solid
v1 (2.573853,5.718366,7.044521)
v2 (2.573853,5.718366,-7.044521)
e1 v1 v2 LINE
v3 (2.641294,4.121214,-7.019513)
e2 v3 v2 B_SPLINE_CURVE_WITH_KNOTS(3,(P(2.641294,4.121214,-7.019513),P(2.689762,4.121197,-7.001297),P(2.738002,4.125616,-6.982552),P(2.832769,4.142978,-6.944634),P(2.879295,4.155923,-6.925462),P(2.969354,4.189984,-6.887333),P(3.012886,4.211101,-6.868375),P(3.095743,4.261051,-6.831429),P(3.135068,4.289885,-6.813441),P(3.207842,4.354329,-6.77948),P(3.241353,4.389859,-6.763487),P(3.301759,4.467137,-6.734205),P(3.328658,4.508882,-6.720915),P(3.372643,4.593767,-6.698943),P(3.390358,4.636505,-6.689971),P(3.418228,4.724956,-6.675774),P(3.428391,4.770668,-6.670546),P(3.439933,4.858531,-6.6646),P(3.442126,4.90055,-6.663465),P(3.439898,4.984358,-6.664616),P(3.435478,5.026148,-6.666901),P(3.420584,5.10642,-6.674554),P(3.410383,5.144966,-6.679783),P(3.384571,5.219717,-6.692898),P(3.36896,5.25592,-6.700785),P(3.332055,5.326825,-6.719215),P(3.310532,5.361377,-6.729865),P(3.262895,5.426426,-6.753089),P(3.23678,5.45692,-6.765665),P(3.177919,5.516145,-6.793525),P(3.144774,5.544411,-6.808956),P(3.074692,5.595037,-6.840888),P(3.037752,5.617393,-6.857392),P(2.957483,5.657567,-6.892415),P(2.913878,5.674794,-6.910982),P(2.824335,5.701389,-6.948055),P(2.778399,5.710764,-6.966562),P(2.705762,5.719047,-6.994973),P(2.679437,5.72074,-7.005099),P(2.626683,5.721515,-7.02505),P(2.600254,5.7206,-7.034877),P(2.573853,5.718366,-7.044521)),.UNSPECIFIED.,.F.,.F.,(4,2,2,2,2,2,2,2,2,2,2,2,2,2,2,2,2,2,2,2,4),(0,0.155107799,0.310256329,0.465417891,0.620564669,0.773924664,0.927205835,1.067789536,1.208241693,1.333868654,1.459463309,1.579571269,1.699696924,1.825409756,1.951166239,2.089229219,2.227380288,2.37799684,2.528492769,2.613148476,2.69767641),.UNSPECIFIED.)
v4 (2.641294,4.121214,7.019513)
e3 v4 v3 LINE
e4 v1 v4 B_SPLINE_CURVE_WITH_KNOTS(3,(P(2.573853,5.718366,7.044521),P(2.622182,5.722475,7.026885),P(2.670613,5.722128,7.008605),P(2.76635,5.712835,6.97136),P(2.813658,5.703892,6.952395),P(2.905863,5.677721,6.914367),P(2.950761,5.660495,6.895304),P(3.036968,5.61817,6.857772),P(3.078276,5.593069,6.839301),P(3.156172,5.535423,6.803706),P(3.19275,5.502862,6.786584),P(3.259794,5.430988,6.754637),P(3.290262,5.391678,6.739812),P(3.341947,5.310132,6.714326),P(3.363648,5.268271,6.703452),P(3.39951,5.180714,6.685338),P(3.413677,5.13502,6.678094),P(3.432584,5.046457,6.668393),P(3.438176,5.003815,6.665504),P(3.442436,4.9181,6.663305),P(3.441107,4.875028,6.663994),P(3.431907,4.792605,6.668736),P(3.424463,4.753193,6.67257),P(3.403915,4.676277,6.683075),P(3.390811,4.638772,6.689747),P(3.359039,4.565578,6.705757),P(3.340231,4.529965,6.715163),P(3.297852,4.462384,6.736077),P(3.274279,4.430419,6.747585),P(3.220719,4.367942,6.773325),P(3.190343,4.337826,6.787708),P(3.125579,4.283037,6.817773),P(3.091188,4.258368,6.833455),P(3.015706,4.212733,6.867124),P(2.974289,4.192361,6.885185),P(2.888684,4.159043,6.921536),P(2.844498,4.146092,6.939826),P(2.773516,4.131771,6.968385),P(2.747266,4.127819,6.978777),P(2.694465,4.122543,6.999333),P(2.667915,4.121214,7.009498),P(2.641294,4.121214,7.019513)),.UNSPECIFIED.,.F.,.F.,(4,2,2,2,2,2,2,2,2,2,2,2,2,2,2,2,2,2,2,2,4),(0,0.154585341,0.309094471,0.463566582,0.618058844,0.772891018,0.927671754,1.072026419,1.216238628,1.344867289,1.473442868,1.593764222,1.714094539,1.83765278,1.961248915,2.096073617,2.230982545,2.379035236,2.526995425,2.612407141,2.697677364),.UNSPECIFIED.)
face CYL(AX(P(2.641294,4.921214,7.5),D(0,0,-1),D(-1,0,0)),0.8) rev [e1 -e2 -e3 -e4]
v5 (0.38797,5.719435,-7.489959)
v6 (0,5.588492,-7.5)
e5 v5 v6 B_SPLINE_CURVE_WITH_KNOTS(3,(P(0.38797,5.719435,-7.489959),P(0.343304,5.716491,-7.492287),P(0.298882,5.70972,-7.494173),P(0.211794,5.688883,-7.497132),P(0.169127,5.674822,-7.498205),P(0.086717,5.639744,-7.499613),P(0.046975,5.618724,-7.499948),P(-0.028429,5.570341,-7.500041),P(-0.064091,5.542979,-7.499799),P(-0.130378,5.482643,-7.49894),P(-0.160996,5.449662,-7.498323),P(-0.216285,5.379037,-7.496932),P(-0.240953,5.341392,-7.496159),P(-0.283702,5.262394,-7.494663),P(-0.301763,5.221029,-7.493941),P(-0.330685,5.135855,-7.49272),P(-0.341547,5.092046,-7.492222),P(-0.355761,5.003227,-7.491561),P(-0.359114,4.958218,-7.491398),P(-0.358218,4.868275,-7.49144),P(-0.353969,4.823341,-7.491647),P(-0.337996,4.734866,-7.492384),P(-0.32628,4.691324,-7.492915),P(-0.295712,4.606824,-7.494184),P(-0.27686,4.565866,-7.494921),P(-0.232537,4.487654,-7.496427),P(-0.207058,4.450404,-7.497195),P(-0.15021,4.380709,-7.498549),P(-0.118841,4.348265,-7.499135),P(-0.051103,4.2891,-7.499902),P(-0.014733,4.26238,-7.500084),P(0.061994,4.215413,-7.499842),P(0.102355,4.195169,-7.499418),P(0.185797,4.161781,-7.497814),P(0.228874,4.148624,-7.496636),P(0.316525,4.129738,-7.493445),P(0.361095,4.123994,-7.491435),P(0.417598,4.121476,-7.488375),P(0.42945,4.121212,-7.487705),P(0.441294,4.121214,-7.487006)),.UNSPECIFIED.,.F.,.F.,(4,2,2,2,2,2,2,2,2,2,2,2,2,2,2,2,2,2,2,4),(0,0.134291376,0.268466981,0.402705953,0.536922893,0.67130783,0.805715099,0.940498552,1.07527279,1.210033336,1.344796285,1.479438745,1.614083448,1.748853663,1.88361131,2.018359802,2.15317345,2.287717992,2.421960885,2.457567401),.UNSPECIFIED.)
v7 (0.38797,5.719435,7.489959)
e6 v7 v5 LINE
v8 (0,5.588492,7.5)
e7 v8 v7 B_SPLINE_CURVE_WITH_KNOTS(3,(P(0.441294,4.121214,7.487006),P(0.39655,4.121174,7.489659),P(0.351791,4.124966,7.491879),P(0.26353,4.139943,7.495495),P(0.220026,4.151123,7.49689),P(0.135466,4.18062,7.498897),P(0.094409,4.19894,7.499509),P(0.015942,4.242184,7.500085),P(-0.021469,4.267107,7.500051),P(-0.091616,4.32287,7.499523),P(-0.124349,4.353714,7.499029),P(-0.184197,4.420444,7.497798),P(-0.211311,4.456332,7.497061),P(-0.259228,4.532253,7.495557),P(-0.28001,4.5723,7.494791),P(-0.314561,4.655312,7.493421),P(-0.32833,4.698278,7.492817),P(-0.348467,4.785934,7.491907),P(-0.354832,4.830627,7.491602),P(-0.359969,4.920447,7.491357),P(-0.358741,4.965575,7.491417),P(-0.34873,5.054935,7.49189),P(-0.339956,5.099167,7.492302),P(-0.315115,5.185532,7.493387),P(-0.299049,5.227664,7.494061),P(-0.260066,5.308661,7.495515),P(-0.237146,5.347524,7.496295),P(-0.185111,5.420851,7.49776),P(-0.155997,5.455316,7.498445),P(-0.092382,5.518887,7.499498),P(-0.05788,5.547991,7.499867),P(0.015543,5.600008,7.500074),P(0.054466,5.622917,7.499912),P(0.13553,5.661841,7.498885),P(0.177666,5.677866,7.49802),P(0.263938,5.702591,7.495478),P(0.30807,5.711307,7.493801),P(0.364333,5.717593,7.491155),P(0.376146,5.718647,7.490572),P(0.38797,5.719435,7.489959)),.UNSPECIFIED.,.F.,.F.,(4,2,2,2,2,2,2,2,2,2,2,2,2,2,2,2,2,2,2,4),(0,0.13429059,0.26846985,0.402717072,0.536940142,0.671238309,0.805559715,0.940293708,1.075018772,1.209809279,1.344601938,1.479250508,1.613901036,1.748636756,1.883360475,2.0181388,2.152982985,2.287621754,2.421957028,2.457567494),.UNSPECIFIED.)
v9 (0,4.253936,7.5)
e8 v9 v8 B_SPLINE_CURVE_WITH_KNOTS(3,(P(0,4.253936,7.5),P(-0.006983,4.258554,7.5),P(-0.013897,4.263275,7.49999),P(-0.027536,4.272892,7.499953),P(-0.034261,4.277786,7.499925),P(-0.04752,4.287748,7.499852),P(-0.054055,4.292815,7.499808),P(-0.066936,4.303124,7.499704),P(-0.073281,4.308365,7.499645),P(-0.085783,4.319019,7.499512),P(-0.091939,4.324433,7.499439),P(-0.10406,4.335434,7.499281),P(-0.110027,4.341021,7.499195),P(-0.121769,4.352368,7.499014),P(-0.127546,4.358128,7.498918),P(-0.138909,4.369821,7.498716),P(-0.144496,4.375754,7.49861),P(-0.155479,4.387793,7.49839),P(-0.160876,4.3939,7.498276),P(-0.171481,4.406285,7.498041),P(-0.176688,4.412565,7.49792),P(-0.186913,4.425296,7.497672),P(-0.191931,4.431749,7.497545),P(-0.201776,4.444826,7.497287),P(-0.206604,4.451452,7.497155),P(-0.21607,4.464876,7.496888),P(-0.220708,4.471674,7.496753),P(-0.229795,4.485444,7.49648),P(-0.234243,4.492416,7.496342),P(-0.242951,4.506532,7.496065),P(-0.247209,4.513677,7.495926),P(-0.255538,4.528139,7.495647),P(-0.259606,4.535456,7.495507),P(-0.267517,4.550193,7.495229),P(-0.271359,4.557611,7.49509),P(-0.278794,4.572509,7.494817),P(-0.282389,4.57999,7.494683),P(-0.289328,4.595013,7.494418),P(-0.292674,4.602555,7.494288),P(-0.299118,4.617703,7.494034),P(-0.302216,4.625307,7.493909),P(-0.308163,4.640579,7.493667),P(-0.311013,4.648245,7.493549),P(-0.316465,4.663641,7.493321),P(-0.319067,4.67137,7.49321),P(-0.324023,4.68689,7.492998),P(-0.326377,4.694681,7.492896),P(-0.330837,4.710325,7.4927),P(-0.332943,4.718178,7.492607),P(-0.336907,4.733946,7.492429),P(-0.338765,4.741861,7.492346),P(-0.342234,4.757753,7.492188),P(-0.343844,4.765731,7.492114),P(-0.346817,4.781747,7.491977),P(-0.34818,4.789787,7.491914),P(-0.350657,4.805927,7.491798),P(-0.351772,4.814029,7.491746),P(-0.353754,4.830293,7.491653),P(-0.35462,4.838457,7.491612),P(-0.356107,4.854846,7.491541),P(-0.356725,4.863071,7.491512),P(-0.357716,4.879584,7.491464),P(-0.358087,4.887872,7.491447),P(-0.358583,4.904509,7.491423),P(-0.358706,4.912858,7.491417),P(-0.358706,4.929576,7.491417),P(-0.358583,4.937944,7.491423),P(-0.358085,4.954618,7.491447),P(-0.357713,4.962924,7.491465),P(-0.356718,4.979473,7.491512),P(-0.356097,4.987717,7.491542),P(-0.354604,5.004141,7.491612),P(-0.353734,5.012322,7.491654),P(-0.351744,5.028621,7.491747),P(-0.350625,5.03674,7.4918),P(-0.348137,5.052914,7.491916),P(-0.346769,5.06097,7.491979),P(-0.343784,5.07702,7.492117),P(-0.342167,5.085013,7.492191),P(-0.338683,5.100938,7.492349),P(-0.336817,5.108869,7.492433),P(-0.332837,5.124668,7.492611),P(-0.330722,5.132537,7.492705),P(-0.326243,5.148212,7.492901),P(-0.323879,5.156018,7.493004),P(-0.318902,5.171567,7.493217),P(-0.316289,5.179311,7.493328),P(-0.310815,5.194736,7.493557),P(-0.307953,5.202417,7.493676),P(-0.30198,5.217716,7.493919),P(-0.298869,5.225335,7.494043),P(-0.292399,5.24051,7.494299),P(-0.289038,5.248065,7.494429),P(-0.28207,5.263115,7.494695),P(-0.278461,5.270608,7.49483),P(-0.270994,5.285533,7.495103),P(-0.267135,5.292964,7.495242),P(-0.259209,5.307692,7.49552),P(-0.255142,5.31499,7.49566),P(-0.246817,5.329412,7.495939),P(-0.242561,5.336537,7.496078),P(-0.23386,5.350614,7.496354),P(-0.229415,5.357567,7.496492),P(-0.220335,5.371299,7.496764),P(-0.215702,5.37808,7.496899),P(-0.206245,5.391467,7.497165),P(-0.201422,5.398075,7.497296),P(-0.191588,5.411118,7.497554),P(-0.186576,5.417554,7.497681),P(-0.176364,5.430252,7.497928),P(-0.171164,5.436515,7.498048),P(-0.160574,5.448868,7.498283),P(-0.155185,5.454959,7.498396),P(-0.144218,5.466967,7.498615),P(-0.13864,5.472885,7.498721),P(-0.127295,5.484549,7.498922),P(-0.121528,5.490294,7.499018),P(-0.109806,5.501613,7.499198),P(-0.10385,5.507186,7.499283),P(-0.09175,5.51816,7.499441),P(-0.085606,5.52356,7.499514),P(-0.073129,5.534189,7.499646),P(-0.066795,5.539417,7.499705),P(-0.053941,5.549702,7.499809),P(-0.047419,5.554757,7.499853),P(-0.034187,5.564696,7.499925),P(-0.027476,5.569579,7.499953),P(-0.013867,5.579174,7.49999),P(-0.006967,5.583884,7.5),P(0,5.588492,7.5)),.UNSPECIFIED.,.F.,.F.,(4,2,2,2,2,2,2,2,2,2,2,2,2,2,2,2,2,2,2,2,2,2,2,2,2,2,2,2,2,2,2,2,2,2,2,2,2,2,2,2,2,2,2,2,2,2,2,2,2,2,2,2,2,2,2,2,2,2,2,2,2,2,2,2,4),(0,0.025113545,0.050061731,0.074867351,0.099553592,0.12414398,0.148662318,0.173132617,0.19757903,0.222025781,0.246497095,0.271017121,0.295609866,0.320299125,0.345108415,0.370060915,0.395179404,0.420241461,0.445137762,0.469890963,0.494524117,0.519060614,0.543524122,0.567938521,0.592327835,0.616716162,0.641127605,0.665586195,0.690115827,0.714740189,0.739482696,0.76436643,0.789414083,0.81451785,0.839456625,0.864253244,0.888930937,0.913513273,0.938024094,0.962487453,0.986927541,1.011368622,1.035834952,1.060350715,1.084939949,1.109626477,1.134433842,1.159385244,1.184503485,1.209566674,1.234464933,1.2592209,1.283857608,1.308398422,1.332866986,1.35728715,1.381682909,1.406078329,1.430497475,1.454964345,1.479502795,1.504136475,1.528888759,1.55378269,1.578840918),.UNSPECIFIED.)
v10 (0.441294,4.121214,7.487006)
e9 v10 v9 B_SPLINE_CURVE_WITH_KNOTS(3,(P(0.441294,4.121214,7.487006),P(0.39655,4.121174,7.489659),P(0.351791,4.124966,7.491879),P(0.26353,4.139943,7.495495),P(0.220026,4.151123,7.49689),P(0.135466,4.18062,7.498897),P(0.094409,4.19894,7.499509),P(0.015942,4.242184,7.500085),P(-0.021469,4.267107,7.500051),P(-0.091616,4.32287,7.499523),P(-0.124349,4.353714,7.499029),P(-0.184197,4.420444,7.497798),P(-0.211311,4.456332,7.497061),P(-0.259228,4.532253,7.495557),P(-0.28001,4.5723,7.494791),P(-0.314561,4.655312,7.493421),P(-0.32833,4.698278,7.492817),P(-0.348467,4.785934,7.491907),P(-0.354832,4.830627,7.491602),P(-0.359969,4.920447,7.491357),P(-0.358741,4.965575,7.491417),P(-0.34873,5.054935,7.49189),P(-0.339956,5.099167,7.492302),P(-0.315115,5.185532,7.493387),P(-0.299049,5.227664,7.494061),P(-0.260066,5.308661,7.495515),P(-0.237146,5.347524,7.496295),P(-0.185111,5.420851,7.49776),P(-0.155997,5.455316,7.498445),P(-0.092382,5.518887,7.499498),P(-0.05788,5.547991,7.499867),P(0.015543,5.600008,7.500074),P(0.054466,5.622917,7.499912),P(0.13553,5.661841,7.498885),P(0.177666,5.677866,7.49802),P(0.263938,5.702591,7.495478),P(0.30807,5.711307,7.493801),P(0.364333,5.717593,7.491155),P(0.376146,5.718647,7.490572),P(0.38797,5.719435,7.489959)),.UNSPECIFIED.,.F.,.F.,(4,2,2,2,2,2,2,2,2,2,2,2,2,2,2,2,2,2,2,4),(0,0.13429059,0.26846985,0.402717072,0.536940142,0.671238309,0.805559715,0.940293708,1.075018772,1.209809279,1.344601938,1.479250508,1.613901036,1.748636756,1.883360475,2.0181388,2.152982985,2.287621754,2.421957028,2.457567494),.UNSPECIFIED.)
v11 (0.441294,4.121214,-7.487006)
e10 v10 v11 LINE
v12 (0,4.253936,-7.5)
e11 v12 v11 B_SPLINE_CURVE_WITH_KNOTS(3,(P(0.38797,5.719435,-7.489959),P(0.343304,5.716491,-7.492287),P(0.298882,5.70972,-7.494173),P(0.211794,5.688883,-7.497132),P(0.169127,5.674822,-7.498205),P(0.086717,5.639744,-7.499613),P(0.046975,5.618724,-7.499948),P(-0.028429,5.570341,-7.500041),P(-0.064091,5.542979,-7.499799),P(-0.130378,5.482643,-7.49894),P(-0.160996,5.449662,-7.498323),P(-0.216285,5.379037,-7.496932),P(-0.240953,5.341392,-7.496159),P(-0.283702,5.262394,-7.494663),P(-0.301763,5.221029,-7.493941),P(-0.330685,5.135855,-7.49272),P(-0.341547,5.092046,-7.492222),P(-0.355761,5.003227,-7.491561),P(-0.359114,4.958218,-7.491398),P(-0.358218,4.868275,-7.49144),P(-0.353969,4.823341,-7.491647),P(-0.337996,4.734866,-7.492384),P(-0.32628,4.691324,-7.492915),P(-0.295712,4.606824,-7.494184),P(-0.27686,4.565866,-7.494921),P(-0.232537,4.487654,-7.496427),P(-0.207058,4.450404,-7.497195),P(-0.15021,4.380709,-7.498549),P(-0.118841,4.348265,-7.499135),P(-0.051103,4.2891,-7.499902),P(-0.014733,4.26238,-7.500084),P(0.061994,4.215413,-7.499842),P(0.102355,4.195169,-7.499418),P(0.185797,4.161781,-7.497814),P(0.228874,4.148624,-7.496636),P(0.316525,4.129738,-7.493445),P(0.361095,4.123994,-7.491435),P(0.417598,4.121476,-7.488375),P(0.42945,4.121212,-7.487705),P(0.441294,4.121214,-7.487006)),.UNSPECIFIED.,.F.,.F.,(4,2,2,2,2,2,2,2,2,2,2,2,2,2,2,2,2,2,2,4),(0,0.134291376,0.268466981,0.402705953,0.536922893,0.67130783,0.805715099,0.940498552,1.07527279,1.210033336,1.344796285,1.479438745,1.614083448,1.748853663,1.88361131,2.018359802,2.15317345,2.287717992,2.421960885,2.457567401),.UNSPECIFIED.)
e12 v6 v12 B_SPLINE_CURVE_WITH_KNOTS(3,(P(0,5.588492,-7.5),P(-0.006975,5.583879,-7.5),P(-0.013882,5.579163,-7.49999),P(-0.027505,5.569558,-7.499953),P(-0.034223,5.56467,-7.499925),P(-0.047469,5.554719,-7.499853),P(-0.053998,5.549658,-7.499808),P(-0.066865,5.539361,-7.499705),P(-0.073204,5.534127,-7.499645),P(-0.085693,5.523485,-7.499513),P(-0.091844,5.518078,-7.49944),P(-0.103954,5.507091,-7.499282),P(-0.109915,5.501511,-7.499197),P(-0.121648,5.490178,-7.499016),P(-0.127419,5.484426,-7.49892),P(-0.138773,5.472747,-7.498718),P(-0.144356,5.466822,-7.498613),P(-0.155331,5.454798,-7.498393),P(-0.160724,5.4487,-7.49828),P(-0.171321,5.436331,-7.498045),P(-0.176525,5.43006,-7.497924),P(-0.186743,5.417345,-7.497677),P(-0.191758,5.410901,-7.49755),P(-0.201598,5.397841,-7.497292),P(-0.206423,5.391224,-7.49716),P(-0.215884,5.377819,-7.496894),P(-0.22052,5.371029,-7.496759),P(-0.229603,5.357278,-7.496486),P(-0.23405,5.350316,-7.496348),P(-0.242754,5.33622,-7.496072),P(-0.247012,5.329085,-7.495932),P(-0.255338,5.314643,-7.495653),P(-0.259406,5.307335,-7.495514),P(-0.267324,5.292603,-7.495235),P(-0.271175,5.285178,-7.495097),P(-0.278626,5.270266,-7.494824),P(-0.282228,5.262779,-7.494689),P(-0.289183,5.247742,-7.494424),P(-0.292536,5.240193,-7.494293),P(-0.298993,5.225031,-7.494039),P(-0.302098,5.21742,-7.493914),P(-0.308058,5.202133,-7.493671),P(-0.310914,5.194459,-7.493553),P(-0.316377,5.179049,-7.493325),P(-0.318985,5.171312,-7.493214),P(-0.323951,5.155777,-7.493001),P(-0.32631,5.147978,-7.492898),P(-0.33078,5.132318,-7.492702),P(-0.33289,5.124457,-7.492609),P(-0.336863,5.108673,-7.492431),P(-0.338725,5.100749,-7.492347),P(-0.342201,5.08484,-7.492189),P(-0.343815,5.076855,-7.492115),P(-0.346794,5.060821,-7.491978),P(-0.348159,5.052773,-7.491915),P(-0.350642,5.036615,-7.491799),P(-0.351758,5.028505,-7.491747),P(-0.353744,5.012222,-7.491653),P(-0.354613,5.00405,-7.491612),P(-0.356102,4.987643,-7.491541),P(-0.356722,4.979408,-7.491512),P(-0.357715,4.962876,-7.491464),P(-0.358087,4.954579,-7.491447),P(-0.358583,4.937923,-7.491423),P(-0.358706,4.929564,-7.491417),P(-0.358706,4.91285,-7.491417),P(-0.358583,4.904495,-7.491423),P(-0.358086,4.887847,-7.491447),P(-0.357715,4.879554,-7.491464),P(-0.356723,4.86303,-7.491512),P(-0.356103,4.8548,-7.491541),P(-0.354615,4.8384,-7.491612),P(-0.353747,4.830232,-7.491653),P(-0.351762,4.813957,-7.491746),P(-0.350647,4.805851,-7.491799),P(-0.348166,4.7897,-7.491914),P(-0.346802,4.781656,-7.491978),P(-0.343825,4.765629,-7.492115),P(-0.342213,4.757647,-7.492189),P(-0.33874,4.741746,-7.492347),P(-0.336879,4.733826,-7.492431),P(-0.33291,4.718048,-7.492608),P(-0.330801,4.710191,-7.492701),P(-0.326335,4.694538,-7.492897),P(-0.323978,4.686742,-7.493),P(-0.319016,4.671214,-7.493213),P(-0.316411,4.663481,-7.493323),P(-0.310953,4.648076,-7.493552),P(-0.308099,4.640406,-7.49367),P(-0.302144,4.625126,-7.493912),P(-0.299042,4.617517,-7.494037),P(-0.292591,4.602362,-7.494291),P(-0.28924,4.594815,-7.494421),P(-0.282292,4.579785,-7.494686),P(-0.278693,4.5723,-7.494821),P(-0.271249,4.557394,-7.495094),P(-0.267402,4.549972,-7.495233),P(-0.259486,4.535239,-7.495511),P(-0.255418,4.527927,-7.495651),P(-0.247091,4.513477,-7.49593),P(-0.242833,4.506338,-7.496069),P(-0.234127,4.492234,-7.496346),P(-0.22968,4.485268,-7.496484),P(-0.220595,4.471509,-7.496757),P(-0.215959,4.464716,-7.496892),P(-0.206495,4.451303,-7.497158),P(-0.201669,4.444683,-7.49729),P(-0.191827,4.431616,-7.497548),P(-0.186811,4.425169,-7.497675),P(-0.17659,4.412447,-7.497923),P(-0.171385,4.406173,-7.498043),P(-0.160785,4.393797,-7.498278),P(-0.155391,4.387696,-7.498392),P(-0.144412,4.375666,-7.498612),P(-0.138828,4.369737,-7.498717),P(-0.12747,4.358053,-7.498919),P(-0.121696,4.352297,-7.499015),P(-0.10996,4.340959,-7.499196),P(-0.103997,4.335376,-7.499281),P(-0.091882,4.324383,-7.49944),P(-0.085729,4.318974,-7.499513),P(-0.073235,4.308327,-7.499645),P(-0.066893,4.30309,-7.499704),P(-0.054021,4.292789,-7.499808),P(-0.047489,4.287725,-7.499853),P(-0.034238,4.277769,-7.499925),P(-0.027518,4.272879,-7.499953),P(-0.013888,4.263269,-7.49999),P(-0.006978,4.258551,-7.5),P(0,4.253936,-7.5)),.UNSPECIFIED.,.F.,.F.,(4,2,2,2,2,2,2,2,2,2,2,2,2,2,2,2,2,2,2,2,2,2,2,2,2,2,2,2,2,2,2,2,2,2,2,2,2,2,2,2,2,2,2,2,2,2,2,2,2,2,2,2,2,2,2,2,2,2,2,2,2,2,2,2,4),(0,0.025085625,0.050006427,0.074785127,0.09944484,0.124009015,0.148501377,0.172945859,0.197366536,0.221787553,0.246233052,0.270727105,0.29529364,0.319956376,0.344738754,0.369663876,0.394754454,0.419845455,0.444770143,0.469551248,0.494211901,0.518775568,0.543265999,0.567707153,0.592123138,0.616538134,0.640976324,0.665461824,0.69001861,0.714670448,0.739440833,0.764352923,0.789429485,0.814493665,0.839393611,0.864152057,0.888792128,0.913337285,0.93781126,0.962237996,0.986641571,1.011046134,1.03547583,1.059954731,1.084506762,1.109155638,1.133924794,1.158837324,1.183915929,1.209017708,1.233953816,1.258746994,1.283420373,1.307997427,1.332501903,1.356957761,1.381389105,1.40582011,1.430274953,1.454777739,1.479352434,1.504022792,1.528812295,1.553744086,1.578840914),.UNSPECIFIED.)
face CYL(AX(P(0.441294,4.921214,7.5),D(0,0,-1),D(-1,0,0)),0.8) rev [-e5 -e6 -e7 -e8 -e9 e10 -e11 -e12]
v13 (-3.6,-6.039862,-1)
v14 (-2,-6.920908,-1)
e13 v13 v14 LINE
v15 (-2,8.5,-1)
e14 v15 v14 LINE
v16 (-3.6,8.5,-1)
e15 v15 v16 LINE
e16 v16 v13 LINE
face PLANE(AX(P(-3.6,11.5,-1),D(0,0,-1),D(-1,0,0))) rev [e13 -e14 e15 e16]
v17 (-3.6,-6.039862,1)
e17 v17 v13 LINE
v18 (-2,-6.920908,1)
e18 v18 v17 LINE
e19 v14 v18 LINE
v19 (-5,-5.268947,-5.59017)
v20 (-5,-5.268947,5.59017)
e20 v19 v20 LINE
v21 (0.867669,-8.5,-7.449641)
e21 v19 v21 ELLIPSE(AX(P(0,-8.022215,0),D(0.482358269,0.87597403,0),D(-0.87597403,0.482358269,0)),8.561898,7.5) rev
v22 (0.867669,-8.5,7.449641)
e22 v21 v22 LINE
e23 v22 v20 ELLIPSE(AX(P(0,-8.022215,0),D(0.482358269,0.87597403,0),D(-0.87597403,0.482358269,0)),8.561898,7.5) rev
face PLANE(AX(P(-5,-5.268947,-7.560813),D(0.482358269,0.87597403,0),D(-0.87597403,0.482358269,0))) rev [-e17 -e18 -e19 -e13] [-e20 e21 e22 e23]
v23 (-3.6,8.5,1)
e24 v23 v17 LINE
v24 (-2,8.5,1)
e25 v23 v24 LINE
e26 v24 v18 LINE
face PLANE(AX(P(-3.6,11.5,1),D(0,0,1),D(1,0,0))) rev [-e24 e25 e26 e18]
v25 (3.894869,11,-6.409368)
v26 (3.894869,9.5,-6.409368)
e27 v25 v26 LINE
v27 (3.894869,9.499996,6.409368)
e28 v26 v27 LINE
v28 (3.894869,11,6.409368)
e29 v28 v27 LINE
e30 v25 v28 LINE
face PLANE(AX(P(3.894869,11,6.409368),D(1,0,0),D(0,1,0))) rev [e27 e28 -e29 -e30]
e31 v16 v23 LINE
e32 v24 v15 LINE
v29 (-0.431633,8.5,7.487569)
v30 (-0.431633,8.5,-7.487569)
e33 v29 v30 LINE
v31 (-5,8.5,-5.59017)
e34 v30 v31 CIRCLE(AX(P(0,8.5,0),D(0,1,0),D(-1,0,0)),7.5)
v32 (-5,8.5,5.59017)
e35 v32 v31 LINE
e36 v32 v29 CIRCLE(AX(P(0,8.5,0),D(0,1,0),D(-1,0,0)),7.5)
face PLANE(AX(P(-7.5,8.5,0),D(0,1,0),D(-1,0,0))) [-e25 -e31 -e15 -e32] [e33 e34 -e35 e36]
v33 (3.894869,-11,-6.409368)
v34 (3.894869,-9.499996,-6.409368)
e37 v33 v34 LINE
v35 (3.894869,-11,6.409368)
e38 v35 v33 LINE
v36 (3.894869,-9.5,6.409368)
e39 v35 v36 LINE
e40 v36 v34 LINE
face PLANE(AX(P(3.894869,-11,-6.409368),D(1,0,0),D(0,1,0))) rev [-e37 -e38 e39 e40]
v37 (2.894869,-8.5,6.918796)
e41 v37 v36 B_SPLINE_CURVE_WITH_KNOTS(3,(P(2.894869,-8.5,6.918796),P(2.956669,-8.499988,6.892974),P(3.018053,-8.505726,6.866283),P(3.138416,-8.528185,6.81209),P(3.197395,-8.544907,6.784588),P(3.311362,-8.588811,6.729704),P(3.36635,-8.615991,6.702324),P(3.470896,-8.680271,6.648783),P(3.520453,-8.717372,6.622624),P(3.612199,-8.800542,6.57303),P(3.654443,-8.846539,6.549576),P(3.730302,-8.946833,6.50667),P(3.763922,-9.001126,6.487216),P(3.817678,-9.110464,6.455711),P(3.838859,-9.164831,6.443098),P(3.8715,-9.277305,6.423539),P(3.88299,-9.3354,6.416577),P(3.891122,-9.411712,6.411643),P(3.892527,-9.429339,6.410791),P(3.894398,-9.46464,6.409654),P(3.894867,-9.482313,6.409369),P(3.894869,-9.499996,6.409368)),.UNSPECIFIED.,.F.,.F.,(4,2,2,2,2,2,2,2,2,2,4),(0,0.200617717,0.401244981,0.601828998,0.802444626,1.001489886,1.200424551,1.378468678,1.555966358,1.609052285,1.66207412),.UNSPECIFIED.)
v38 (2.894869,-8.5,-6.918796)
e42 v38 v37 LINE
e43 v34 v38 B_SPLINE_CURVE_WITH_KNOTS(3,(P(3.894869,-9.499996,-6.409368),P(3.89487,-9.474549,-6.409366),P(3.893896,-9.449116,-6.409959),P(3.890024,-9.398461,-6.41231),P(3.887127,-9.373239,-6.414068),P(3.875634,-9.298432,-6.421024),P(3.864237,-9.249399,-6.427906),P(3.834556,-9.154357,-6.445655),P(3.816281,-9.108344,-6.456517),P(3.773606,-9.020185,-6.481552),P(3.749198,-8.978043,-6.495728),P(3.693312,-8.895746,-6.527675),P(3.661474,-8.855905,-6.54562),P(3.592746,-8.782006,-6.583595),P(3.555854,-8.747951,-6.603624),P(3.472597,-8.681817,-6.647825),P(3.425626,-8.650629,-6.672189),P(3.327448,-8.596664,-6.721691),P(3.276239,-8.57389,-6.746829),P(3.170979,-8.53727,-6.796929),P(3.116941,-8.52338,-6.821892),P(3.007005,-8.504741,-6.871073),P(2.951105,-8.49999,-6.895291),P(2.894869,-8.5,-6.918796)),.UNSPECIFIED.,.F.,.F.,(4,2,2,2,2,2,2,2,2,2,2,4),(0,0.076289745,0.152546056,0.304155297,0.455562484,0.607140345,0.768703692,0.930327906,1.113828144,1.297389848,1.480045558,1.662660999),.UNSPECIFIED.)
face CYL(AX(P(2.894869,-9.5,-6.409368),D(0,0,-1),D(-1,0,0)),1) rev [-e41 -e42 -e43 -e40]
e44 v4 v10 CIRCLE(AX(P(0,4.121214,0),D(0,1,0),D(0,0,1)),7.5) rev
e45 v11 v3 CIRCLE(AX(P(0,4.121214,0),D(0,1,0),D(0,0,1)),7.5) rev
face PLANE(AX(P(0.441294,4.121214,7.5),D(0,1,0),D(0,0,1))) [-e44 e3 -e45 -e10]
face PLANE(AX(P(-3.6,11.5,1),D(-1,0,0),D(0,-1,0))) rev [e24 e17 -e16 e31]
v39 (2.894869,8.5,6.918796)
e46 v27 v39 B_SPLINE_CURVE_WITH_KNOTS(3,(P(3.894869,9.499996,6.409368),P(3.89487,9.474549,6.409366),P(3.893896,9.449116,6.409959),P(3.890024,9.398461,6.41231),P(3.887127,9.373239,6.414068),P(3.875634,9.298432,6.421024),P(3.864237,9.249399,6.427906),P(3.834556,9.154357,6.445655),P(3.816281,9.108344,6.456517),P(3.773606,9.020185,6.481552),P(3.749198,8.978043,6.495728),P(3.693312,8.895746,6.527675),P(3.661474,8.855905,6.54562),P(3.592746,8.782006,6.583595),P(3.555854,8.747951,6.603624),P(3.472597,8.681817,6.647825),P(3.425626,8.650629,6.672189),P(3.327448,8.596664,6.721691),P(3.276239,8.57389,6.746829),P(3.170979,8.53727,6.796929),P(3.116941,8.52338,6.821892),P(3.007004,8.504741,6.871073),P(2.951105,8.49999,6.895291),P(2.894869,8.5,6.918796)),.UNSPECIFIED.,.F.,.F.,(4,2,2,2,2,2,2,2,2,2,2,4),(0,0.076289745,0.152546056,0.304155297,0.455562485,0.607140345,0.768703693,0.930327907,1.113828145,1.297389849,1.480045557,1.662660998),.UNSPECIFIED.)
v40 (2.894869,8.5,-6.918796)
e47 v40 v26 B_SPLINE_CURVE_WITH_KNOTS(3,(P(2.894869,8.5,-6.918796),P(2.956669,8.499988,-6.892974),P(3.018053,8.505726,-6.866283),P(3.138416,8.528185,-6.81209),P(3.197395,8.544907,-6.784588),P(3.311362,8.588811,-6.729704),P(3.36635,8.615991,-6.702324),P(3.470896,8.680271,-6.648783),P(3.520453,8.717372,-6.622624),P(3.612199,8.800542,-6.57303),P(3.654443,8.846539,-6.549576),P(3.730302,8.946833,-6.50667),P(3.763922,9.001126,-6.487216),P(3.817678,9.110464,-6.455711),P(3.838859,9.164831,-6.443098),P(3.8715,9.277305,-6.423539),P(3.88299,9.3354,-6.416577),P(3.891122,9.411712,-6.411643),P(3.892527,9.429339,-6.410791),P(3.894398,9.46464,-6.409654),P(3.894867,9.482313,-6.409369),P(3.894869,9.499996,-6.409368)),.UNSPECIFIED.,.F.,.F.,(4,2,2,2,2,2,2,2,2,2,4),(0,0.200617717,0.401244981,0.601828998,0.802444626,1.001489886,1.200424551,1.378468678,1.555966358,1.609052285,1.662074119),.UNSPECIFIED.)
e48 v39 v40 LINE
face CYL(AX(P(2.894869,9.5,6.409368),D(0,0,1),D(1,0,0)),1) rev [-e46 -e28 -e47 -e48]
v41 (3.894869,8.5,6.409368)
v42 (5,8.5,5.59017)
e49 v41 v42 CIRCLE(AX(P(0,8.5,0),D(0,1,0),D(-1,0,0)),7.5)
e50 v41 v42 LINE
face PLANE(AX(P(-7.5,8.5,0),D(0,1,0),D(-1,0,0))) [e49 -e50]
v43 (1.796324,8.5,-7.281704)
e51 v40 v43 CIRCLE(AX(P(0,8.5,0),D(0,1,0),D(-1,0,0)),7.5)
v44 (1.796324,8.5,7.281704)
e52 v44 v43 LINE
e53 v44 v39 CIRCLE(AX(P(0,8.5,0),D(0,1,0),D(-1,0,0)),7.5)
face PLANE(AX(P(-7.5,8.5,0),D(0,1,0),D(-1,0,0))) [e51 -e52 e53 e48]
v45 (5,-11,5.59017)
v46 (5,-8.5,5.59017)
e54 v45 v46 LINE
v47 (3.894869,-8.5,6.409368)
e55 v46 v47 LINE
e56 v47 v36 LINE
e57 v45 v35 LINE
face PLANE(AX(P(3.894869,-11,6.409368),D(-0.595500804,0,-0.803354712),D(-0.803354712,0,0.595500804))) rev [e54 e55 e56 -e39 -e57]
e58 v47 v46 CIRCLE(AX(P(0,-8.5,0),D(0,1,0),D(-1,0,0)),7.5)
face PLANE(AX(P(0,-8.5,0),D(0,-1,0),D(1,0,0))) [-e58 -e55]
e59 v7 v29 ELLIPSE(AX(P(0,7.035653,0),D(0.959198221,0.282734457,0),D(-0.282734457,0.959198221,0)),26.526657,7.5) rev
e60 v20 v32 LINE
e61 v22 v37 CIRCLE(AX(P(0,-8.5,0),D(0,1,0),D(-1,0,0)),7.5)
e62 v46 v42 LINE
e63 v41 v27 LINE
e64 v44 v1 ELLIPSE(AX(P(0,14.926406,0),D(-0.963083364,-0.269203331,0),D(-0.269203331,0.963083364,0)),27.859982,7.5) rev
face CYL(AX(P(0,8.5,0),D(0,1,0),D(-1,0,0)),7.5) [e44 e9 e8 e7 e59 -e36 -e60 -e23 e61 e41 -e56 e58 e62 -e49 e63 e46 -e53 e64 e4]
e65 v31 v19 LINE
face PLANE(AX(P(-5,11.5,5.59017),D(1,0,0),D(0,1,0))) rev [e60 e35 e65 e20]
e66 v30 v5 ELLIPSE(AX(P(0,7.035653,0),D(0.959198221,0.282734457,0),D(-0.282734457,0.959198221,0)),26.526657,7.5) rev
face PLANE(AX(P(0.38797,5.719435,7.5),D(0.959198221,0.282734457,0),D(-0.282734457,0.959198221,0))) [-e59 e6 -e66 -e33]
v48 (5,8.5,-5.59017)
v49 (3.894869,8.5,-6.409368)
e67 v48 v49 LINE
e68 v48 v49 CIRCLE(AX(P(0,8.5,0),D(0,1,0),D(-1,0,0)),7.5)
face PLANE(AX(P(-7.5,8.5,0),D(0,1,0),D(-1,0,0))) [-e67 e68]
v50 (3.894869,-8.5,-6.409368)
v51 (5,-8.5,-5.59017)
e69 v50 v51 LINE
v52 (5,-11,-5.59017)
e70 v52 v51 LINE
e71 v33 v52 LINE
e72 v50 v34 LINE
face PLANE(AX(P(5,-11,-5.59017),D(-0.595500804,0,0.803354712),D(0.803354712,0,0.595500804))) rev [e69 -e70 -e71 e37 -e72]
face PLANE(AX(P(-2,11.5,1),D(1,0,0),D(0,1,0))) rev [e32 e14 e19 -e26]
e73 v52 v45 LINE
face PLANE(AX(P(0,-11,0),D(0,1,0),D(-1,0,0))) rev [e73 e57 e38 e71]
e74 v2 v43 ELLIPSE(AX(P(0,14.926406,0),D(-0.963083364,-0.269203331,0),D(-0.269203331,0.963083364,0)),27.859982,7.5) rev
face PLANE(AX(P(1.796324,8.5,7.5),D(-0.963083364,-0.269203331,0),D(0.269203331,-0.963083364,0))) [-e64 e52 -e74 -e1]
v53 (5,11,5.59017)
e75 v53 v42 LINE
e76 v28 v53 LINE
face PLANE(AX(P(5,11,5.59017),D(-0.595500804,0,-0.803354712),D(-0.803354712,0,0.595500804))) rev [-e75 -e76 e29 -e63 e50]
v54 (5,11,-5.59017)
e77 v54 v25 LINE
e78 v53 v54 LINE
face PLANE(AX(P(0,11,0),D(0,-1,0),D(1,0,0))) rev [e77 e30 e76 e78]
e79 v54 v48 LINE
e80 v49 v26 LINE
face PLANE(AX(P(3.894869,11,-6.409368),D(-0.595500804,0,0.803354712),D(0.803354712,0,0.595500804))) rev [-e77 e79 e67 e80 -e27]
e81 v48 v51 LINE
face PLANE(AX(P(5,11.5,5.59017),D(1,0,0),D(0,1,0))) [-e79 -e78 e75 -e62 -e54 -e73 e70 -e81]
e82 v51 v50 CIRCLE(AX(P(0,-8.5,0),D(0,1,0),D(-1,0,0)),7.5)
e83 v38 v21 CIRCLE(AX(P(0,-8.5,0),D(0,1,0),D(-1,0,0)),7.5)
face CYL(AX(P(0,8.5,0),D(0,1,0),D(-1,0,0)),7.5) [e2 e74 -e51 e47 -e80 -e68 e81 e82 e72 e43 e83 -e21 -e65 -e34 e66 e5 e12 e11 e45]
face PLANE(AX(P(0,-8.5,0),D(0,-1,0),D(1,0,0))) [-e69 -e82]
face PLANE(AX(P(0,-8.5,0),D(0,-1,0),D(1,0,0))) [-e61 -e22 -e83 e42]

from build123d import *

# Parameters (mm, degrees)
SKETCH1_W               = 7.5
SKETCH1_H               = 17
CUT_EXTRUDE1_START      = -20
CUT_EXTRUDE1_DEPTH      = 20
SKETCH4_W               = 1.6
SKETCH4_H               = 2
CUT_EXTRUDE2_DEPTH      = 20
CUT_EXTRUDE3_DEPTH      = 13.389511693
CUT_EXTRUDE3_DEPTH_BACK = 13.389511693
CUT_EXTRUDE4_DEPTH      = 13.389511863
CUT_EXTRUDE4_DEPTH_BACK = 13.389511863
BOSS_EXTRUDE4_DEPTH     = 2.5
FILLET1_R               = 1
BOSS_EXTRUDE7_DEPTH     = 2.5
FILLET5_R               = 1


with BuildPart() as part:
    # Sketch1 → Revolve1 (revolve)
    with BuildSketch(Plane.XY):
        with Locations((-3.75, 0)):
            Rectangle(SKETCH1_W, SKETCH1_H)
    revolve(axis=Axis((0, 8.5, 0), (0, -1, 0)))

    # Sketch2 → Cut-Extrude1 (cut)
    with BuildSketch(Plane.XZ.offset(8.5).offset(CUT_EXTRUDE1_START)):
        with BuildLine():
            Line((-5, 5.590169944), (-5, -5.590169944))
            ThreePointArc((-5, -5.590169944), (-7.5, 0), (-5, 5.590169944))
        make_face()
    cut_extrude1 = extrude(amount=CUT_EXTRUDE1_DEPTH, mode=Mode.SUBTRACT)

    # Sketch4 → Cut-Extrude2 (cut)
    with BuildSketch(Plane.XZ.offset(8.5)):
        with Locations((-2.8, 0)):
            Rectangle(SKETCH4_W, SKETCH4_H)
    extrude(amount=-CUT_EXTRUDE2_DEPTH, mode=Mode.SUBTRACT)

    # Mirror1: Cut-Extrude1 across plane
    add(cut_extrude1.mirror(Plane(origin=(0, 0, 0), x_dir=(0, 0, 1), z_dir=(1, 0, 0))), mode=Mode.SUBTRACT)

    # Sketch7 → Cut-Extrude3 (cut, two sides: drawn at the far end of the back side and taken through both)
    with BuildSketch(Plane.XY.offset(-CUT_EXTRUDE3_DEPTH_BACK)):
        with BuildLine():
            Line((0.441294084, 4.12121402), (2.641294084, 4.12121402))
            ThreePointArc((2.641294084, 4.12121402), (2.930486649, 4.17531345), (3.180566332, 4.330294869))
            ThreePointArc((3.180566332, 4.330294869), (3.374330031, 5.241617362), (2.573852958, 5.718366261))
            Line((2.573852958, 5.718366261), (1.796324142, 8.5))
            Line((1.796324142, 8.5), (-0.431632782, 8.5))
            Line((-0.431632782, 8.5), (0.38797004, 5.719434883))
            ThreePointArc((0.38797004, 5.719434883), (-0.156844774, 5.452467167), (-0.357641011, 4.879950081))
            ThreePointArc((-0.357641011, 4.879950081), (-0.109609196, 4.341123014), (0.441294084, 4.12121402))
        make_face()
    extrude(amount=CUT_EXTRUDE3_DEPTH + CUT_EXTRUDE3_DEPTH_BACK, mode=Mode.SUBTRACT)

    # Sketch8 → Cut-Extrude4 (cut, two sides: drawn at the far end of the back side and taken through both)
    with BuildSketch(Plane.XY.offset(-CUT_EXTRUDE4_DEPTH_BACK)):
        Polygon((-5, -5.268946984), (0.867668731, -8.5), (-5, -8.5), align=None)
    extrude(amount=CUT_EXTRUDE4_DEPTH + CUT_EXTRUDE4_DEPTH_BACK, mode=Mode.SUBTRACT)

    # Sketch13 → Boss-Extrude4 (add)
    with BuildSketch(Plane(origin=(0, 8.5, 0), x_dir=(1, 0, 0), z_dir=(0, 1, 0))):
        Polygon((5, 5.590169944), (5, -5.590169944), (3.894868524, -6.40936808), (3.894868524, 6.40936808), align=None)
    extrude(amount=BOSS_EXTRUDE4_DEPTH)

    # Fillet1
    # the kernel refuses this fillet: 1 mm, written as the material it adds along each edge
    with BuildSketch(Plane(origin=(3.894868524, 8.5, 8.90936808), x_dir=(-1, 0, 0), z_dir=(0, 0, -1))) as fillet1_piece_1_section:
        with BuildLine():
            CenterArc((FILLET1_R, FILLET1_R), FILLET1_R, 180, 90)
            Line((0, FILLET1_R), (0, 0))
            Line((0, 0), (FILLET1_R, 0))
        make_face()
    fillet1_piece_1 = extrude(amount=17.81873616, mode=Mode.PRIVATE)
    fillet1_piece_1 = fillet1_piece_1 & Plane(origin=(0, 8.724088474, 0), x_dir=(-1, 0, 0), z_dir=(0, 1, 0)) * Cylinder(7.5, 40, mode=Mode.PRIVATE)
    fillet1_piece_1 = split(fillet1_piece_1, bisect_by=Plane(origin=(6.812525482, 8.724088474, 4.246603564), z_dir=(-0.5955008037670206, -6.20137611558393e-15, -0.8033547116391566)), keep=Keep.TOP, mode=Mode.PRIVATE)
    add(fillet1_piece_1)

    # Sketch15 → Boss-Extrude7 (add)
    with BuildSketch(Plane.XZ.offset(8.5)):
        Polygon((5, 5.590169944), (5, -5.590169944), (3.894868524, -6.40936808), (3.894868524, 6.40936808), align=None)
    extrude(amount=BOSS_EXTRUDE7_DEPTH)

    # Fillet5
    # the kernel refuses this fillet: 1 mm, written as the material it adds along each edge
    with BuildSketch(Plane(origin=(3.894868524, -8.5, -8.90936808), x_dir=(-1, 0, 0), z_dir=(0, 0, 1))) as fillet5_piece_1_section:
        with BuildLine():
            CenterArc((FILLET5_R, FILLET5_R), FILLET5_R, 180, 90)
            Line((0, FILLET5_R), (0, 0))
            Line((0, 0), (FILLET5_R, 0))
        make_face()
    fillet5_piece_1 = extrude(amount=17.81873616, mode=Mode.PRIVATE)
    fillet5_piece_1 = fillet5_piece_1 & Plane(origin=(0, -8.724088474, 0), x_dir=(-1, 0, 0), z_dir=(0, 1, 0)) * Cylinder(7.5, 40, mode=Mode.PRIVATE)
    fillet5_piece_1 = split(fillet5_piece_1, bisect_by=Plane(origin=(6.812525482, -8.724088474, -4.246603564), z_dir=(-0.5955008037671681, -6.201376115585466e-15, 0.8033547116390474)), keep=Keep.TOP, mode=Mode.PRIVATE)
    add(fillet5_piece_1)


solid = part.part
